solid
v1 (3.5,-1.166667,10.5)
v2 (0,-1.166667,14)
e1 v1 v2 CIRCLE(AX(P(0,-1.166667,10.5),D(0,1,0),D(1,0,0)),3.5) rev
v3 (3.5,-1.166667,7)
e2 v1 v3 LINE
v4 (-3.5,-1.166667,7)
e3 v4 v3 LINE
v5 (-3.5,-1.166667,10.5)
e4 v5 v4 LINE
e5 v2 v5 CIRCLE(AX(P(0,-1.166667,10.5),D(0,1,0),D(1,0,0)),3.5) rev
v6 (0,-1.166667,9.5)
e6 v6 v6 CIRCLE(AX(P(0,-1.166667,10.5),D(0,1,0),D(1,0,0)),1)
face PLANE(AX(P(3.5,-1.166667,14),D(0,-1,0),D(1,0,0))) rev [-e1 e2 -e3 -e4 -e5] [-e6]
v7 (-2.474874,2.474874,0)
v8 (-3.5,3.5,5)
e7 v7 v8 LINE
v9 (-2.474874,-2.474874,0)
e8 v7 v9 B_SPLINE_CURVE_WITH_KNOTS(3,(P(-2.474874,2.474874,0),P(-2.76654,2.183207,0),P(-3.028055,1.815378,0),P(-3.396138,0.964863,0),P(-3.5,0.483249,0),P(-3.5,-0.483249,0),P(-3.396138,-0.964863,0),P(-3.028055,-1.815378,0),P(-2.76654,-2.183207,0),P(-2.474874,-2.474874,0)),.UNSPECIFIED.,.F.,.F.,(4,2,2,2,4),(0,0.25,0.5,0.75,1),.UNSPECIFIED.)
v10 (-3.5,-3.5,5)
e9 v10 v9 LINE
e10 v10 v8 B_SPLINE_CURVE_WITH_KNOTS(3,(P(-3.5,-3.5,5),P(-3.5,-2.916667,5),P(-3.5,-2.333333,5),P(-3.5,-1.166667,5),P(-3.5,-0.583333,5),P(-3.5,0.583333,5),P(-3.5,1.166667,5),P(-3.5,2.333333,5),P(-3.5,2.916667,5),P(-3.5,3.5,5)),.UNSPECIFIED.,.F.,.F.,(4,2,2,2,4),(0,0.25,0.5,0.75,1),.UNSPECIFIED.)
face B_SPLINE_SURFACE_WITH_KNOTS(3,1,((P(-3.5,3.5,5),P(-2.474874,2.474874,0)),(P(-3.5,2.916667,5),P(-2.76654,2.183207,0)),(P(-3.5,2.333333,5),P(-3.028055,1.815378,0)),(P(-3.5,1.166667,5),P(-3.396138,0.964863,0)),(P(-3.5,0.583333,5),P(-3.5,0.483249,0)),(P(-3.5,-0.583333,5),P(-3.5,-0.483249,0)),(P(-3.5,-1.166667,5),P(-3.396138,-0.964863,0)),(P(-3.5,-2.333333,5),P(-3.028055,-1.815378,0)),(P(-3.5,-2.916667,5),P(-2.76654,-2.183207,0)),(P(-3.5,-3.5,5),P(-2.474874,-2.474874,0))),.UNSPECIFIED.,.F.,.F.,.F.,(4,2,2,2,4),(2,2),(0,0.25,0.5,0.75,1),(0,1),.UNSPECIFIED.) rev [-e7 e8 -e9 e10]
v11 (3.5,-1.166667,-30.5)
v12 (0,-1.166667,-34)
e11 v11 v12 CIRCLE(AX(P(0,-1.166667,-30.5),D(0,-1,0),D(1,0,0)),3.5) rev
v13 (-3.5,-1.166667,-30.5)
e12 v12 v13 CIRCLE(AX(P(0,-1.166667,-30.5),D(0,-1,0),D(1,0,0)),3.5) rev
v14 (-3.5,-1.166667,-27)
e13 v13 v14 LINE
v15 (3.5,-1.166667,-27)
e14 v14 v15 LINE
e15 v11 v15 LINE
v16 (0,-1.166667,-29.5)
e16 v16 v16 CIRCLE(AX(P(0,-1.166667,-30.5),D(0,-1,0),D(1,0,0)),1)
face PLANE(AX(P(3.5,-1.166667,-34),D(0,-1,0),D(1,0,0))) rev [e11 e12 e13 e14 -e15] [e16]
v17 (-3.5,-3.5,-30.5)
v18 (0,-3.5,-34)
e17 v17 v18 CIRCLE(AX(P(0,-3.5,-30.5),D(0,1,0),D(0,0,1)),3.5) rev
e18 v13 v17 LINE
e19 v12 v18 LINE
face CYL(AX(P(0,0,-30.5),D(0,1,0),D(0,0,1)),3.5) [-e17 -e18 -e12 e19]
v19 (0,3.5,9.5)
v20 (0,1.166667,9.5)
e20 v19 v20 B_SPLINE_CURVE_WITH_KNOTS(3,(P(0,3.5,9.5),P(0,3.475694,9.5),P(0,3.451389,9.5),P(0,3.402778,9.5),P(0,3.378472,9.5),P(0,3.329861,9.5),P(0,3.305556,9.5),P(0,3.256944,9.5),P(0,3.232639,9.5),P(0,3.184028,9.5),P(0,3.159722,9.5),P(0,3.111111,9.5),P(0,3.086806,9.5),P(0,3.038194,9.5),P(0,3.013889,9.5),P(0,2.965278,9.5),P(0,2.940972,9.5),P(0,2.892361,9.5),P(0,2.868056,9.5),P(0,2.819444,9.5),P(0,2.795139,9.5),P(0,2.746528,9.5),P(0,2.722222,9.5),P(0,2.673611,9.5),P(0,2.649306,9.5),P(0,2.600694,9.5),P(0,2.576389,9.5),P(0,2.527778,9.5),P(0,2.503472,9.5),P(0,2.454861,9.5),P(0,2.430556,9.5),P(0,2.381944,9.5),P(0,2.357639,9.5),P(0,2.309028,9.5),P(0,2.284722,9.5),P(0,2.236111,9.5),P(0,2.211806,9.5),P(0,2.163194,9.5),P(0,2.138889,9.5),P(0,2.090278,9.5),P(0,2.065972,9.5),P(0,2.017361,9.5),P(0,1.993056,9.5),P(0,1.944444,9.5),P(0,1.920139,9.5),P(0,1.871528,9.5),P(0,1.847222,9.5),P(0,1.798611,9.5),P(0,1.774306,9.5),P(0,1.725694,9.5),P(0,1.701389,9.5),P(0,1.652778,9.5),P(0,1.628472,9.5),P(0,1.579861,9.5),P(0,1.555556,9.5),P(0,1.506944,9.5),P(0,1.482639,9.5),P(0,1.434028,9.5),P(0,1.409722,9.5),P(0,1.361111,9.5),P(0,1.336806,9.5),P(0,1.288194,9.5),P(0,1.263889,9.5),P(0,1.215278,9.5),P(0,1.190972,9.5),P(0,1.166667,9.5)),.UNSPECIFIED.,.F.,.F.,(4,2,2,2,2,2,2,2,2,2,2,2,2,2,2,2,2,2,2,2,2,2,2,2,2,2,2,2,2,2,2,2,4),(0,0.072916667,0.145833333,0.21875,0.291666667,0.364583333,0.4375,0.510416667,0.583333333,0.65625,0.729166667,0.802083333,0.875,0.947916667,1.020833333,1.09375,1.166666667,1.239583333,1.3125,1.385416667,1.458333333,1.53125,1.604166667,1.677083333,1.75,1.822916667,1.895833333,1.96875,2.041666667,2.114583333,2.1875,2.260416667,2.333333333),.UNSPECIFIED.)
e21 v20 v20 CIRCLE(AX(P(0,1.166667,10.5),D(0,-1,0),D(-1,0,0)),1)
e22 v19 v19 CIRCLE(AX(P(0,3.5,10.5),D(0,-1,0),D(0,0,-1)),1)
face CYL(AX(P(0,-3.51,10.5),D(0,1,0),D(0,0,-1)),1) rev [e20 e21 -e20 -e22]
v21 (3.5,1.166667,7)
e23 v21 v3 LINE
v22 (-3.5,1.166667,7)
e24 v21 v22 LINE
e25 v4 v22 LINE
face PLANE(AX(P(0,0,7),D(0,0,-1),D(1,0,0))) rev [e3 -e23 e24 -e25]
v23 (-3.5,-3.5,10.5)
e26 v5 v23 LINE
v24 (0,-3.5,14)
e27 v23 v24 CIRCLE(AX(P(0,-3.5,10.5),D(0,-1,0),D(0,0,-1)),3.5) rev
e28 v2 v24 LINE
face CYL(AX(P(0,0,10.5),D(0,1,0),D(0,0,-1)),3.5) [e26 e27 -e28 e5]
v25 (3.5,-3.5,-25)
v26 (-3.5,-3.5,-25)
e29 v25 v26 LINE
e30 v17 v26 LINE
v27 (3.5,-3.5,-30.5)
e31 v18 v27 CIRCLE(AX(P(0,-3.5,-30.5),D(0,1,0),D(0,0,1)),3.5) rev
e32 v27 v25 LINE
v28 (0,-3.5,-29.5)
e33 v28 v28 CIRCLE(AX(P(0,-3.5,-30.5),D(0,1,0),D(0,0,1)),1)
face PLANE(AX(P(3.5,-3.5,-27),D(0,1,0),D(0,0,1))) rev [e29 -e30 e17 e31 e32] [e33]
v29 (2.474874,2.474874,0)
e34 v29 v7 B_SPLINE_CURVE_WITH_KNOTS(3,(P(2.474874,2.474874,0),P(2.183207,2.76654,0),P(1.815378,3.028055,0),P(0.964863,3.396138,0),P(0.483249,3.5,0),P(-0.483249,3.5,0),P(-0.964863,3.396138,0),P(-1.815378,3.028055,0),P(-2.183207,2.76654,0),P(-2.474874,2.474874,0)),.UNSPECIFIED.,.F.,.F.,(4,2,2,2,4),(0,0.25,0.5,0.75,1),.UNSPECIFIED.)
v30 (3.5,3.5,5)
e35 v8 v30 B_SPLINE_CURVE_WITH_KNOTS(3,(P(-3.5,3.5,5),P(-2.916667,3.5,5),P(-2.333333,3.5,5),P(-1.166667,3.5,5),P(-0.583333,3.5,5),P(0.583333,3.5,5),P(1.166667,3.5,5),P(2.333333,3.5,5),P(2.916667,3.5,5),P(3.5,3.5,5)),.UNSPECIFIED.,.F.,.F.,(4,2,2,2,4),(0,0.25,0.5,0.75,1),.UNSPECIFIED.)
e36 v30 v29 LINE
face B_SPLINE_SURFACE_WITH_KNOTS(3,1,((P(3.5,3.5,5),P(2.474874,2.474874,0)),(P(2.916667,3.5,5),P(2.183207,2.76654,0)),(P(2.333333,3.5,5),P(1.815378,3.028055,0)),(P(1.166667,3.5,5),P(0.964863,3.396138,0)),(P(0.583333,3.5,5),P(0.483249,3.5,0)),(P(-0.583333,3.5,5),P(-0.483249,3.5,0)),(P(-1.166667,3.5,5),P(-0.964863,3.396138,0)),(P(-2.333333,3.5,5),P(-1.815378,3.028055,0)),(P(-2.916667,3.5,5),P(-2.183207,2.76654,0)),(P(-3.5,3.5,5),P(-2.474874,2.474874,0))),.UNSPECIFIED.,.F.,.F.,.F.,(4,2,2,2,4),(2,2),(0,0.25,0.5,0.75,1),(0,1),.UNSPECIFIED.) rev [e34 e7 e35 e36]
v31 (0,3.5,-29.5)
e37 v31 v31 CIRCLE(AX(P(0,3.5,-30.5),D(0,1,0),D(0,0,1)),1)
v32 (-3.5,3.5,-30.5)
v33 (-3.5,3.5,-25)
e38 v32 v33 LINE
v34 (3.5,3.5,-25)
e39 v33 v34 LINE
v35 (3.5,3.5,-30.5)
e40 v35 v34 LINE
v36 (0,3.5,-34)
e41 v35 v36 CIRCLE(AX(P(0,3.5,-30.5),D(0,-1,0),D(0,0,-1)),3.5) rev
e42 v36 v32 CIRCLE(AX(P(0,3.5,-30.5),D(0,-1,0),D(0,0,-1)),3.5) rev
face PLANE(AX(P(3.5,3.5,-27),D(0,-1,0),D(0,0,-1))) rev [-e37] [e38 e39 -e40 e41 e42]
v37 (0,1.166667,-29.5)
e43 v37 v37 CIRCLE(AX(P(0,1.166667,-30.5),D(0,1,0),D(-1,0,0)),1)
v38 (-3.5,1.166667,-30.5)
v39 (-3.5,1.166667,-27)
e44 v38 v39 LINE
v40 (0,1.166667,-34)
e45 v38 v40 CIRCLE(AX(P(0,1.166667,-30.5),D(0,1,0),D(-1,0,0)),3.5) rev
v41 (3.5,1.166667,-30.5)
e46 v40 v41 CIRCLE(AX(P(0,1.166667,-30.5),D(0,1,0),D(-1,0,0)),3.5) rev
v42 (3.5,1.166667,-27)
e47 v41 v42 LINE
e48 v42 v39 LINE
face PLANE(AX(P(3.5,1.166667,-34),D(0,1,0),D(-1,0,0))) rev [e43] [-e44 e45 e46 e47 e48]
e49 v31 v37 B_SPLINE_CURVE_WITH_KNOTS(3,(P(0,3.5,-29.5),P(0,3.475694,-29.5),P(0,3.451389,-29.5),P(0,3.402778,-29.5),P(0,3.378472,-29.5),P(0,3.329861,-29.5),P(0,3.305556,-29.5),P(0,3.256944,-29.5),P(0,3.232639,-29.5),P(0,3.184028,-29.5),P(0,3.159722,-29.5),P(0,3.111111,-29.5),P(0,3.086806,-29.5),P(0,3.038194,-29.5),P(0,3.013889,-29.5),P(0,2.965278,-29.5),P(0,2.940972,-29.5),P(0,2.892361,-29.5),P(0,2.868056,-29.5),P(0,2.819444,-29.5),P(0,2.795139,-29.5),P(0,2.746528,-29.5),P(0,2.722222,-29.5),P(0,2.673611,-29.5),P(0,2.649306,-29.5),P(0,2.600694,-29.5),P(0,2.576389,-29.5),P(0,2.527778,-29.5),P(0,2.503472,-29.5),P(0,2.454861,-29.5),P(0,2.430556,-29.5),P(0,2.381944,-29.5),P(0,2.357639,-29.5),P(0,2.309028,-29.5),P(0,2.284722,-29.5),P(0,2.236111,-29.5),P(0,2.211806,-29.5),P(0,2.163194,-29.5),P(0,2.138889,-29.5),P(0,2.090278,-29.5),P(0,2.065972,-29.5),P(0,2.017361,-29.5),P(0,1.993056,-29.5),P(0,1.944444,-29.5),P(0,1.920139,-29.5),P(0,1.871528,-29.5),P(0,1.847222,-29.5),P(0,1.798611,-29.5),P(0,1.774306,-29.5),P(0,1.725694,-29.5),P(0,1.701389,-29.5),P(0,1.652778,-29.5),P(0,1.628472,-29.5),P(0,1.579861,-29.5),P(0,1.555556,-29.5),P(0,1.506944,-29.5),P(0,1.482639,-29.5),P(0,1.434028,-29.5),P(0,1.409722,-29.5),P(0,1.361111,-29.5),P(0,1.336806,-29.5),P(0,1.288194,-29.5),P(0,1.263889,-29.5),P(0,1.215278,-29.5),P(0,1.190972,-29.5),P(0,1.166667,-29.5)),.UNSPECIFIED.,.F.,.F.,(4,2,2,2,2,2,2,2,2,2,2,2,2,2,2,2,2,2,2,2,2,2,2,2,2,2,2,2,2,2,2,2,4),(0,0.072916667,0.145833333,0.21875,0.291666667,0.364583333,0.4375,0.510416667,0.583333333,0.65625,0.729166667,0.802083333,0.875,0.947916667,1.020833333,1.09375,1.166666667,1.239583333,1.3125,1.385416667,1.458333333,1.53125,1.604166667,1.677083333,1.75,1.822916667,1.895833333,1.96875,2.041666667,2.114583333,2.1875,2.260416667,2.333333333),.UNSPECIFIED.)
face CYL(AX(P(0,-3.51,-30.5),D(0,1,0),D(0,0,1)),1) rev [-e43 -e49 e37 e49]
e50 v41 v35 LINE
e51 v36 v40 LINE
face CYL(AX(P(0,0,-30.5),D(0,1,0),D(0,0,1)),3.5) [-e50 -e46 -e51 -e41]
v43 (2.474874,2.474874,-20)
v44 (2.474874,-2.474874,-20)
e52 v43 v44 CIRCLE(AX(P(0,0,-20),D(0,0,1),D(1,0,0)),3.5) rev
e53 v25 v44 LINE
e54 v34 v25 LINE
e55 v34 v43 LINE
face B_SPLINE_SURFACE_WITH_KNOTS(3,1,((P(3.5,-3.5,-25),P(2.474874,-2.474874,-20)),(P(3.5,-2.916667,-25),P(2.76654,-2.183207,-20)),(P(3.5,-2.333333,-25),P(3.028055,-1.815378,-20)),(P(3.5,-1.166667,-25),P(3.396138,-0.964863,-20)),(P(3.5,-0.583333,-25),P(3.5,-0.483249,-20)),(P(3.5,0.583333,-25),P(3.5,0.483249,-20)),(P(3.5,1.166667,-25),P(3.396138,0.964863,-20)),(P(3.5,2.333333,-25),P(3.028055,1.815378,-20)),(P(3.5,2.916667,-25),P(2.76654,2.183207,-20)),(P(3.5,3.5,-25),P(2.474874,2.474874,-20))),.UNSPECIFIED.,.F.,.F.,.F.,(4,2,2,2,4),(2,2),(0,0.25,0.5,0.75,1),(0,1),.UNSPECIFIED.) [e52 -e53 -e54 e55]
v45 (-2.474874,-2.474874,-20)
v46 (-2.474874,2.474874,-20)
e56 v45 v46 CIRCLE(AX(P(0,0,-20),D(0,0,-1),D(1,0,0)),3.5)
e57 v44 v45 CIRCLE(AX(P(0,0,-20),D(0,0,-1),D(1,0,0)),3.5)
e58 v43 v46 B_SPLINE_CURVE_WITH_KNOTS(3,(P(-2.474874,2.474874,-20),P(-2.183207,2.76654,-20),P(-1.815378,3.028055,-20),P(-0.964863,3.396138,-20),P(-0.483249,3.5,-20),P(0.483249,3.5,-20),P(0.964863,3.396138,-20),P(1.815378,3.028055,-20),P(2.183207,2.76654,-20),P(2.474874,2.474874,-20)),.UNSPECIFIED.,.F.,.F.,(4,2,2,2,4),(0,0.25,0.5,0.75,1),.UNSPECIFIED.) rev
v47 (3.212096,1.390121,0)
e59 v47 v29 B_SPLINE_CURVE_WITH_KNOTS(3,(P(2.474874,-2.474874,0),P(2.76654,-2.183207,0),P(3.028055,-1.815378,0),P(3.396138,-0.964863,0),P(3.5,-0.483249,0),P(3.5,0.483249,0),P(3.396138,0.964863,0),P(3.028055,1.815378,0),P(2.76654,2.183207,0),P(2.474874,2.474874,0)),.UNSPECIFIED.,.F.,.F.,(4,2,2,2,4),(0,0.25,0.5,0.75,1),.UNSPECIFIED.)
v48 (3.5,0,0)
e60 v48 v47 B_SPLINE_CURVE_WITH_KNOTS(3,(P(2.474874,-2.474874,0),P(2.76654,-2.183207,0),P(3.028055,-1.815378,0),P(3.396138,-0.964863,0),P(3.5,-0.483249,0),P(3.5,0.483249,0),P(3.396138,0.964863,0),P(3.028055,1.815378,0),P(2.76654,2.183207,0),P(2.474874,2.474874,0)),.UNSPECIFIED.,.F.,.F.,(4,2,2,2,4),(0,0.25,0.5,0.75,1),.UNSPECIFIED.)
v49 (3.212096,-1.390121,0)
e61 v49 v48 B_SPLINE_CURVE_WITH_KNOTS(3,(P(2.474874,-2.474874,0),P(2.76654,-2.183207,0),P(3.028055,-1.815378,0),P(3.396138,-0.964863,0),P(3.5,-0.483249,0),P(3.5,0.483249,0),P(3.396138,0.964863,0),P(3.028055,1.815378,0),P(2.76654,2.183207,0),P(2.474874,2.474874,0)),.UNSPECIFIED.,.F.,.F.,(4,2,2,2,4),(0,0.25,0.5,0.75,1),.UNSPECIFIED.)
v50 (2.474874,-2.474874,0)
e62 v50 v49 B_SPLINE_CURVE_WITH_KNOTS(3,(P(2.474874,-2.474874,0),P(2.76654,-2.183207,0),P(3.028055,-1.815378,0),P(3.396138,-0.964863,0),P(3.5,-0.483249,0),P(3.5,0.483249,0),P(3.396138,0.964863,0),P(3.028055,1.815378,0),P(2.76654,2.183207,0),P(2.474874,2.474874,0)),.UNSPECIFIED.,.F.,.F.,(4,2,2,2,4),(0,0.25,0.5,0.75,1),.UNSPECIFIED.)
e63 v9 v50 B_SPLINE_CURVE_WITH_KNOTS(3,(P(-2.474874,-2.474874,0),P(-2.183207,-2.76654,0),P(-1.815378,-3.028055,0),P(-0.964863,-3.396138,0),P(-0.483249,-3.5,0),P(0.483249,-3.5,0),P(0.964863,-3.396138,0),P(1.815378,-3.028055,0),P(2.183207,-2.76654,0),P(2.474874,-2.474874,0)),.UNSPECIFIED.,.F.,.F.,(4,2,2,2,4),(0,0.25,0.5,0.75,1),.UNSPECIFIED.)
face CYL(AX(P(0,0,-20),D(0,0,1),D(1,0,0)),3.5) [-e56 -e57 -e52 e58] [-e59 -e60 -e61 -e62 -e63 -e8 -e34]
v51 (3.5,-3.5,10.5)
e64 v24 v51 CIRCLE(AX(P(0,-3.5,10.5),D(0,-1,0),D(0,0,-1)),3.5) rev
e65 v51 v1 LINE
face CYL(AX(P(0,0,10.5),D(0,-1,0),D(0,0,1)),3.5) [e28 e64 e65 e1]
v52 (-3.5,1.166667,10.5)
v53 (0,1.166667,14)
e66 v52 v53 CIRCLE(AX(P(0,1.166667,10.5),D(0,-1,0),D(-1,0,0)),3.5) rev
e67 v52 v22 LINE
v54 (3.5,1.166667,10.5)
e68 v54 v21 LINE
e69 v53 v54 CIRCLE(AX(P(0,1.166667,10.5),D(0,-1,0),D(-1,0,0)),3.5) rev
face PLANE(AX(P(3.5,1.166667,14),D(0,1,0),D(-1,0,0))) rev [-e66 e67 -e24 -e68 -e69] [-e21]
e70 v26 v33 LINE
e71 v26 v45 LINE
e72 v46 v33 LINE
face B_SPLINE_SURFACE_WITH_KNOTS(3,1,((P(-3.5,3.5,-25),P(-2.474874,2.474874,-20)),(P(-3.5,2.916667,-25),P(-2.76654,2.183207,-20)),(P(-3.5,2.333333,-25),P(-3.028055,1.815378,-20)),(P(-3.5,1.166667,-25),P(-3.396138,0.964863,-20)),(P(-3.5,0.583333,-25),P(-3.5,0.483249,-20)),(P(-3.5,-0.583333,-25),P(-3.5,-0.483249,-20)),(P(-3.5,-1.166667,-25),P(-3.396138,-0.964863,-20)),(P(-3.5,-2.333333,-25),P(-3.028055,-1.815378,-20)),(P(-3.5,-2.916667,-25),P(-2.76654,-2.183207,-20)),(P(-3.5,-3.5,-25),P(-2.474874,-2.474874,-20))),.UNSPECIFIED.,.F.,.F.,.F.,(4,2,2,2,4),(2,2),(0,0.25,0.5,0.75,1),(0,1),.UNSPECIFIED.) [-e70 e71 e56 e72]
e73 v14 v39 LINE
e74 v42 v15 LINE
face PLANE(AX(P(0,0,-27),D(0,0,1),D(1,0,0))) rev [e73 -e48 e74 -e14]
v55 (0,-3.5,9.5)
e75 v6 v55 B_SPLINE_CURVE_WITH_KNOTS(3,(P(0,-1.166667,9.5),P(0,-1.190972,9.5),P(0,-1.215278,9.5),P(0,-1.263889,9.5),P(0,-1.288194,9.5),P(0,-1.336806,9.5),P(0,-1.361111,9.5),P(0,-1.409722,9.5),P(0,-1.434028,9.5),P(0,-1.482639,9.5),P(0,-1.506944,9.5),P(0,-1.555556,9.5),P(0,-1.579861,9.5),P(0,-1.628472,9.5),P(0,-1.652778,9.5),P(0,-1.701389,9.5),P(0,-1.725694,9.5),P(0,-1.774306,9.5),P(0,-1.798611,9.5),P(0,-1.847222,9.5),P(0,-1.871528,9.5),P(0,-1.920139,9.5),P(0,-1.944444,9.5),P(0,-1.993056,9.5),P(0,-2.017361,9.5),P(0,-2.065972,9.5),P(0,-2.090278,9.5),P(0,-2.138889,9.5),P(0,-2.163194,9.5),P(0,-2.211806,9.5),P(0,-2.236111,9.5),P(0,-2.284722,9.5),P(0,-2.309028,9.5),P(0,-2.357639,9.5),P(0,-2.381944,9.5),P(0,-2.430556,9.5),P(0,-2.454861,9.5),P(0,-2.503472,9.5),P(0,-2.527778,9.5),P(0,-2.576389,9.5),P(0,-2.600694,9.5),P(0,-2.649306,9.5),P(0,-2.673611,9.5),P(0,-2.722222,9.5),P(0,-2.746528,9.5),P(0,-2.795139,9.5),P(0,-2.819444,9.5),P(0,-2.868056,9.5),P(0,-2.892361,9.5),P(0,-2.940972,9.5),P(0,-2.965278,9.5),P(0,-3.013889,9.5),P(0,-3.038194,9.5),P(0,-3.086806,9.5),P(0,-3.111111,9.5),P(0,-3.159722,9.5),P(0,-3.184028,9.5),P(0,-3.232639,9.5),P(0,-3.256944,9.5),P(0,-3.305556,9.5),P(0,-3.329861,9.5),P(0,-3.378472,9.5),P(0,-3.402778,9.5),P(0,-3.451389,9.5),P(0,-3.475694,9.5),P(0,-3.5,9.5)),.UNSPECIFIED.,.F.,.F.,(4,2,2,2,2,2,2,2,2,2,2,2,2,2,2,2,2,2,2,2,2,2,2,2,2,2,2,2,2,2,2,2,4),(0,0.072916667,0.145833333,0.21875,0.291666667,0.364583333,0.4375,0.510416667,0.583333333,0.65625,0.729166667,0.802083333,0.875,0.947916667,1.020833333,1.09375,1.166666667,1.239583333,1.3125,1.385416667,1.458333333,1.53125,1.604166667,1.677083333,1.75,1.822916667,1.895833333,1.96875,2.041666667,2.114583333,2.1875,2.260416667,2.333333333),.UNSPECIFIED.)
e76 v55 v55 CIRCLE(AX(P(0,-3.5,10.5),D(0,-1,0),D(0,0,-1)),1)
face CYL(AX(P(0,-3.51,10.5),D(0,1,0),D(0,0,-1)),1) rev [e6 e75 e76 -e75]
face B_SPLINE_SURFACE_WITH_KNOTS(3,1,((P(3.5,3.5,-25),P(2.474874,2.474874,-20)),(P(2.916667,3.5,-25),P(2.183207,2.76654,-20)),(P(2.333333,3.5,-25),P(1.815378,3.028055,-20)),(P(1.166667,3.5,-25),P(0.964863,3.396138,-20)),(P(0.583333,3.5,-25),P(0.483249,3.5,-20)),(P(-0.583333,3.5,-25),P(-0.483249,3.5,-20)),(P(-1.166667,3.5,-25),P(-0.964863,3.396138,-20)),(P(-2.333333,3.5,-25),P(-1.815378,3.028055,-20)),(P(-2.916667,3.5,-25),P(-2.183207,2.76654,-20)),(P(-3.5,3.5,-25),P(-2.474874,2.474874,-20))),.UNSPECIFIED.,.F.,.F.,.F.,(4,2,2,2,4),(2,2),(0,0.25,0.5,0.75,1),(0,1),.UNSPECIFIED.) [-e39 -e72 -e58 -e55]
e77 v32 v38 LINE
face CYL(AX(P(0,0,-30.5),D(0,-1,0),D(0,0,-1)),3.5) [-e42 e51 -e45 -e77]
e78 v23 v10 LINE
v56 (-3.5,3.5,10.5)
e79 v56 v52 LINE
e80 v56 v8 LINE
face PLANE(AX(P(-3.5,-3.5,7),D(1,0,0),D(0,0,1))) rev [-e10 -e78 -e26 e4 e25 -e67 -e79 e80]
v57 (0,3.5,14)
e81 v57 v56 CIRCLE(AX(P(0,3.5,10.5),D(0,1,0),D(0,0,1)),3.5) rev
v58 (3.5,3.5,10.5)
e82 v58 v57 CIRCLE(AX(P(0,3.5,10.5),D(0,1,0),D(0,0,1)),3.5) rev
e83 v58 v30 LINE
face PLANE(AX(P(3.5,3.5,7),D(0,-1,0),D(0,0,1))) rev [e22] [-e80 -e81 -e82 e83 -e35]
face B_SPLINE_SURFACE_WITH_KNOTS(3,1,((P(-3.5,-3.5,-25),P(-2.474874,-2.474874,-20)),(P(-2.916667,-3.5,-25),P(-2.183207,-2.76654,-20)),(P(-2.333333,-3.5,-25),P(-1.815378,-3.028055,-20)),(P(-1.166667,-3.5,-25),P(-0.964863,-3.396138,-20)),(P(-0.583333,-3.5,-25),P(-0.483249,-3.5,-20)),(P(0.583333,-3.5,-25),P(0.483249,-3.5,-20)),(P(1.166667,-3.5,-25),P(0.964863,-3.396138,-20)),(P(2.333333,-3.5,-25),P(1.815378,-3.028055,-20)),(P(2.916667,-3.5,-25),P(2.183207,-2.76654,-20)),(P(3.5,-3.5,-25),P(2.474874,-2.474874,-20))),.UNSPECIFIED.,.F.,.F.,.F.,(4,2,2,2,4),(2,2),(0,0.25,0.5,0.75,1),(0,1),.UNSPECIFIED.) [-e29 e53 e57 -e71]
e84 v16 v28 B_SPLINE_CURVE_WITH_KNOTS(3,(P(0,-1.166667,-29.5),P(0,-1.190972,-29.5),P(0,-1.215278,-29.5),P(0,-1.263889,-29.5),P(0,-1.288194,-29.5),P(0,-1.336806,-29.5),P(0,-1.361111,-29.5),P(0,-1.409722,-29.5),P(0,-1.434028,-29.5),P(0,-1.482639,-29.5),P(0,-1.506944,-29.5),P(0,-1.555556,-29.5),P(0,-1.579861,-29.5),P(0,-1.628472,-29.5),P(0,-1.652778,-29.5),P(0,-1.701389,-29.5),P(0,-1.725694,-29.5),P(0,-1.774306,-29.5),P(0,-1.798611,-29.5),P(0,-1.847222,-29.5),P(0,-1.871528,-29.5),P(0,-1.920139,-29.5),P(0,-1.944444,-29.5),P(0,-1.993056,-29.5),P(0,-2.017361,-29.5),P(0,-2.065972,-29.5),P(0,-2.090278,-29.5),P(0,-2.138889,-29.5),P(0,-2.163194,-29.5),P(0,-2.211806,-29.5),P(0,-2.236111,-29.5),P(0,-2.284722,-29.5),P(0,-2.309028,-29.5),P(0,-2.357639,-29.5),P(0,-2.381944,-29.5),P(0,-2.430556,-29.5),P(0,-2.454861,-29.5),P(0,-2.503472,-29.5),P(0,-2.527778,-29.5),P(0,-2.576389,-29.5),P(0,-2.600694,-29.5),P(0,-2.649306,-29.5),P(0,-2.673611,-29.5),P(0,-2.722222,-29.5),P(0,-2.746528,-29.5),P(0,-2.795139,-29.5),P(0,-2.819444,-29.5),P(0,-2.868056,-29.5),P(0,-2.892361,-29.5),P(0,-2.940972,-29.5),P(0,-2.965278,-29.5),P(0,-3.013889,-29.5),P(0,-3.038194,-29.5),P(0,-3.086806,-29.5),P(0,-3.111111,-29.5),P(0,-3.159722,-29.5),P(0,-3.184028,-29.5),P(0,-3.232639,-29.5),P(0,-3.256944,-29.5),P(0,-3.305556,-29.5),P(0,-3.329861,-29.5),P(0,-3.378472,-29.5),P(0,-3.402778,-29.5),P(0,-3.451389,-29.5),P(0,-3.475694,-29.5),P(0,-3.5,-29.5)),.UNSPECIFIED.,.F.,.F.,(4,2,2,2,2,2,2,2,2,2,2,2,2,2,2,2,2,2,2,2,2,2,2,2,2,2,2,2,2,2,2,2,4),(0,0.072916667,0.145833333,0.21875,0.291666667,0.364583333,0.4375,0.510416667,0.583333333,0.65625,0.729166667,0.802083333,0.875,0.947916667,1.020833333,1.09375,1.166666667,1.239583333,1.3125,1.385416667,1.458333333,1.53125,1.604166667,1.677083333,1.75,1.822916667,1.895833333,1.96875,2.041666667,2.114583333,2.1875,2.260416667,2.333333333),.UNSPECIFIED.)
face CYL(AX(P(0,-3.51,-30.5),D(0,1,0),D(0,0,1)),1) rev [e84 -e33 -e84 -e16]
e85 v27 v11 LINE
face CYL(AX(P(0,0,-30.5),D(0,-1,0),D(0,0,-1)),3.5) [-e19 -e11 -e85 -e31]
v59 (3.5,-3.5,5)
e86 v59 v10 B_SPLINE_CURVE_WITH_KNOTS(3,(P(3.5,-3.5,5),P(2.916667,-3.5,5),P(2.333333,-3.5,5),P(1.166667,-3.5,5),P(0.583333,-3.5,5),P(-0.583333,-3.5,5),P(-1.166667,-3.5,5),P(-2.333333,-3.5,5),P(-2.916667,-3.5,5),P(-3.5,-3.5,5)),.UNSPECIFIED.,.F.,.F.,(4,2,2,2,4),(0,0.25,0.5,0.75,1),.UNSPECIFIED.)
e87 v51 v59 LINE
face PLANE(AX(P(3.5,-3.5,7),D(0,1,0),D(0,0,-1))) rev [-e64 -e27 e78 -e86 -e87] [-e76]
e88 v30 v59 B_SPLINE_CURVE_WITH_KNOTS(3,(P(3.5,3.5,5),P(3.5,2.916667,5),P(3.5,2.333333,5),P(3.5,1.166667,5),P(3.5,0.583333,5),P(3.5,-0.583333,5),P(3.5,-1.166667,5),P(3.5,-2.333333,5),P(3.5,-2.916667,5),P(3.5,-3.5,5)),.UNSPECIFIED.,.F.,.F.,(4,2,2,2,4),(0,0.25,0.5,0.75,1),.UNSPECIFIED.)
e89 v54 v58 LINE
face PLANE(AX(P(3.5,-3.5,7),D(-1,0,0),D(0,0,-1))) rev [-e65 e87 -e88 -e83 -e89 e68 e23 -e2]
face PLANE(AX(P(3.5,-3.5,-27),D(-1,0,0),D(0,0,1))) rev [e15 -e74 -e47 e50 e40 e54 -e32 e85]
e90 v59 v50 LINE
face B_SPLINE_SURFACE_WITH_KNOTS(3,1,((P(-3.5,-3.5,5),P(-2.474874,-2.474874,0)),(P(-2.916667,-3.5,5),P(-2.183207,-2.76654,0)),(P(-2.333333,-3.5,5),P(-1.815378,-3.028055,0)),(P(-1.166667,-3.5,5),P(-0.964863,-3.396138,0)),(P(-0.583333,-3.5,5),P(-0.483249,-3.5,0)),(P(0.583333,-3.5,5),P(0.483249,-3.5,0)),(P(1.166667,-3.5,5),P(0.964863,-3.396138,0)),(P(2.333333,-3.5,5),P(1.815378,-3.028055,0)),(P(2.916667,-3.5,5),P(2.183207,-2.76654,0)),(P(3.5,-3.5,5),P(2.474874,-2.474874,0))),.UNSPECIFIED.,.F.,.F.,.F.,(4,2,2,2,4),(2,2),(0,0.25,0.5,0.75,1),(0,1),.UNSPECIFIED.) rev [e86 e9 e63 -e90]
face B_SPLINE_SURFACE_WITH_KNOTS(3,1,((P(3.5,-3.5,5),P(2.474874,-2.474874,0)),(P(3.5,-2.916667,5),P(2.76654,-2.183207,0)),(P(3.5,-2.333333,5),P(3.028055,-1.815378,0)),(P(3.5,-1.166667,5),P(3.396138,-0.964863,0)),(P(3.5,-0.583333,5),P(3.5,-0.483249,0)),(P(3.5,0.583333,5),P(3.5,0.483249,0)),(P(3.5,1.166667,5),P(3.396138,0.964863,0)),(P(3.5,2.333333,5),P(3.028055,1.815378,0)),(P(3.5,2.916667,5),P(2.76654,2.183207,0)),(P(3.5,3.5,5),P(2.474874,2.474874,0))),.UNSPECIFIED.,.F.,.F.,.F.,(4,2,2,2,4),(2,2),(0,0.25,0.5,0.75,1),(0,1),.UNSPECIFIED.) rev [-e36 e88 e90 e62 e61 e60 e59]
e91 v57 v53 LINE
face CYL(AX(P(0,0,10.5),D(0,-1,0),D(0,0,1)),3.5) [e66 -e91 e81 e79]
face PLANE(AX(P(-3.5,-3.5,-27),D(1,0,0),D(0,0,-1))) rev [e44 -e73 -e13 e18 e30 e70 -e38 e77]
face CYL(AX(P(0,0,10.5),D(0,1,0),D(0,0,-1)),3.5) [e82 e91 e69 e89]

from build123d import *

# Parameters (mm, degrees)
SKETCH1_R           = 3.5
BOSS_EXTRUDE1_DEPTH = 20
SKETCH3_2_W         = 7
SKETCH3_2_H         = 7
BOSS_EXTRUDE3_DEPTH = 2
SKETCH4_W           = 7
SKETCH4_H           = 2.333333333
BOSS_EXTRUDE2_DEPTH = 7
SKETCH5_R           = 1
CUT_EXTRUDE1_DEPTH  = 35.889110176
FILLET1_R           = 3.5


with BuildPart() as part:
    # Sketch1 → Boss-Extrude1 (new body)
    with BuildSketch(Plane.XY):
        Circle(SKETCH1_R)
    extrude(amount=-BOSS_EXTRUDE1_DEPTH)

    # Loft1: read off the stored shape, not the designer's step
    # Loft1: loft between two sections, ruled curve by curve
    loft1_from = [
        Edge.make_bspline([(-3.5, 3.5, -25), (-3.5, 2.916666667, -25), (-3.5, 2.333333333, -25), (-3.5, 1.166666667, -25), (-3.5, 0.583333333, -25), (-3.5, -0.583333333, -25), (-3.5, -1.166666667, -25), (-3.5, -2.333333333, -25), (-3.5, -2.916666667, -25), (-3.5, -3.5, -25)], [0, 0, 0, 0, 0.25, 0.25, 0.5, 0.5, 0.75, 0.75, 1, 1, 1, 1], 3),
        Edge.make_bspline([(-3.5, -3.5, -25), (-2.916666667, -3.5, -25), (-2.333333333, -3.5, -25), (-1.166666667, -3.5, -25), (-0.583333333, -3.5, -25), (0.583333333, -3.5, -25), (1.166666667, -3.5, -25), (2.333333333, -3.5, -25), (2.916666667, -3.5, -25), (3.5, -3.5, -25)], [0, 0, 0, 0, 0.25, 0.25, 0.5, 0.5, 0.75, 0.75, 1, 1, 1, 1], 3),
        Edge.make_bspline([(3.5, 3.5, -25), (2.916666667, 3.5, -25), (2.333333333, 3.5, -25), (1.166666667, 3.5, -25), (0.583333333, 3.5, -25), (-0.583333333, 3.5, -25), (-1.166666667, 3.5, -25), (-2.333333333, 3.5, -25), (-2.916666667, 3.5, -25), (-3.5, 3.5, -25)], [0, 0, 0, 0, 0.25, 0.25, 0.5, 0.5, 0.75, 0.75, 1, 1, 1, 1], 3),
        Edge.make_bspline([(3.5, -3.5, -25), (3.5, -2.916666667, -25), (3.5, -2.333333333, -25), (3.5, -1.166666667, -25), (3.5, -0.583333333, -25), (3.5, 0.583333333, -25), (3.5, 1.166666667, -25), (3.5, 2.333333333, -25), (3.5, 2.916666667, -25), (3.5, 3.5, -25)], [0, 0, 0, 0, 0.25, 0.25, 0.5, 0.5, 0.75, 0.75, 1, 1, 1, 1], 3),
    ]
    loft1_to = [
        Edge.make_bspline([(-2.474873734, 2.474873734, -20), (-2.766540401, 2.183207067, -20), (-3.028055087, 1.815378049, -20), (-3.396138059, 0.964863384, -20), (-3.5, 0.483249156, -20), (-3.5, -0.483249156, -20), (-3.396138059, -0.964863384, -20), (-3.028055087, -1.815378049, -20), (-2.766540401, -2.183207067, -20), (-2.474873734, -2.474873734, -20)], [0, 0, 0, 0, 0.25, 0.25, 0.5, 0.5, 0.75, 0.75, 1, 1, 1, 1], 3),
        Edge.make_bspline([(-2.474873734, -2.474873734, -20), (-2.183207067, -2.766540401, -20), (-1.815378049, -3.028055087, -20), (-0.964863384, -3.396138059, -20), (-0.483249156, -3.5, -20), (0.483249156, -3.5, -20), (0.964863384, -3.396138059, -20), (1.815378049, -3.028055087, -20), (2.183207067, -2.766540401, -20), (2.474873734, -2.474873734, -20)], [0, 0, 0, 0, 0.25, 0.25, 0.5, 0.5, 0.75, 0.75, 1, 1, 1, 1], 3),
        Edge.make_bspline([(2.474873734, 2.474873734, -20), (2.183207067, 2.766540401, -20), (1.815378049, 3.028055087, -20), (0.964863384, 3.396138059, -20), (0.483249156, 3.5, -20), (-0.483249156, 3.5, -20), (-0.964863384, 3.396138059, -20), (-1.815378049, 3.028055087, -20), (-2.183207067, 2.766540401, -20), (-2.474873734, 2.474873734, -20)], [0, 0, 0, 0, 0.25, 0.25, 0.5, 0.5, 0.75, 0.75, 1, 1, 1, 1], 3),
        Edge.make_bspline([(2.474873734, -2.474873734, -20), (2.766540401, -2.183207067, -20), (3.028055087, -1.815378049, -20), (3.396138059, -0.964863384, -20), (3.5, -0.483249156, -20), (3.5, 0.483249156, -20), (3.396138059, 0.964863384, -20), (3.028055087, 1.815378049, -20), (2.766540401, 2.183207067, -20), (2.474873734, 2.474873734, -20)], [0, 0, 0, 0, 0.25, 0.25, 0.5, 0.5, 0.75, 0.75, 1, 1, 1, 1], 3),
    ]
    loft1 = Solid(Shell([*[Face.make_surface_from_curves(loft1_from[k], loft1_to[k]) for k in range(4)], Face(Wire(loft1_from)), Face(Wire(loft1_to))]))
    add(loft1)

    # Sketch3<2> → Boss-Extrude3 (add)
    with BuildSketch(Plane(origin=(0, 0, -25), x_dir=(-1, 0, 0), z_dir=(0, 0, -1))):
        Rectangle(SKETCH3_2_W, SKETCH3_2_H)
    extrude(amount=BOSS_EXTRUDE3_DEPTH)

    # Sketch4 → Boss-Extrude2 (add)
    with BuildSketch(Plane(origin=(0, 0, -27), x_dir=(-1, 0, 0), z_dir=(0, 0, -1))):
        with Locations((0, 2.333333334)):
            Rectangle(SKETCH4_W, SKETCH4_H)
        with Locations((0, -2.333333334)):
            Rectangle(SKETCH4_W, SKETCH4_H)
    extrude(amount=BOSS_EXTRUDE2_DEPTH)

    # Sketch5 → Cut-Extrude1 (cut, through all)
    with BuildSketch(Plane(origin=(0, 3.5, 0), x_dir=(1, 0, 0), z_dir=(0, 1, 0))):
        with Locations(Location((0, 30.5, 0), (0, 0, 270))):
            Circle(SKETCH5_R)
    extrude(amount=-CUT_EXTRUDE1_DEPTH, mode=Mode.SUBTRACT)

    # Fillet1
    fillet1_edges = [part.edges().sort_by_distance(p)[0] for p in [
        (-3.5, 2.333333333, -34),
        (-3.5, -2.333333333, -34),
        (3.5, -2.333333333, -34),
        (3.5, 2.333333333, -34),
    ]]
    fillet(fillet1_edges, radius=FILLET1_R - 0.0001)  # a hair under: the kernel refuses the full size

    # Mirror1: part across plane


with BuildPart() as part_1:
    add(part.part)
    add(part.part.mirror(Plane.XY.offset(-10)))


solid = part_1.part
